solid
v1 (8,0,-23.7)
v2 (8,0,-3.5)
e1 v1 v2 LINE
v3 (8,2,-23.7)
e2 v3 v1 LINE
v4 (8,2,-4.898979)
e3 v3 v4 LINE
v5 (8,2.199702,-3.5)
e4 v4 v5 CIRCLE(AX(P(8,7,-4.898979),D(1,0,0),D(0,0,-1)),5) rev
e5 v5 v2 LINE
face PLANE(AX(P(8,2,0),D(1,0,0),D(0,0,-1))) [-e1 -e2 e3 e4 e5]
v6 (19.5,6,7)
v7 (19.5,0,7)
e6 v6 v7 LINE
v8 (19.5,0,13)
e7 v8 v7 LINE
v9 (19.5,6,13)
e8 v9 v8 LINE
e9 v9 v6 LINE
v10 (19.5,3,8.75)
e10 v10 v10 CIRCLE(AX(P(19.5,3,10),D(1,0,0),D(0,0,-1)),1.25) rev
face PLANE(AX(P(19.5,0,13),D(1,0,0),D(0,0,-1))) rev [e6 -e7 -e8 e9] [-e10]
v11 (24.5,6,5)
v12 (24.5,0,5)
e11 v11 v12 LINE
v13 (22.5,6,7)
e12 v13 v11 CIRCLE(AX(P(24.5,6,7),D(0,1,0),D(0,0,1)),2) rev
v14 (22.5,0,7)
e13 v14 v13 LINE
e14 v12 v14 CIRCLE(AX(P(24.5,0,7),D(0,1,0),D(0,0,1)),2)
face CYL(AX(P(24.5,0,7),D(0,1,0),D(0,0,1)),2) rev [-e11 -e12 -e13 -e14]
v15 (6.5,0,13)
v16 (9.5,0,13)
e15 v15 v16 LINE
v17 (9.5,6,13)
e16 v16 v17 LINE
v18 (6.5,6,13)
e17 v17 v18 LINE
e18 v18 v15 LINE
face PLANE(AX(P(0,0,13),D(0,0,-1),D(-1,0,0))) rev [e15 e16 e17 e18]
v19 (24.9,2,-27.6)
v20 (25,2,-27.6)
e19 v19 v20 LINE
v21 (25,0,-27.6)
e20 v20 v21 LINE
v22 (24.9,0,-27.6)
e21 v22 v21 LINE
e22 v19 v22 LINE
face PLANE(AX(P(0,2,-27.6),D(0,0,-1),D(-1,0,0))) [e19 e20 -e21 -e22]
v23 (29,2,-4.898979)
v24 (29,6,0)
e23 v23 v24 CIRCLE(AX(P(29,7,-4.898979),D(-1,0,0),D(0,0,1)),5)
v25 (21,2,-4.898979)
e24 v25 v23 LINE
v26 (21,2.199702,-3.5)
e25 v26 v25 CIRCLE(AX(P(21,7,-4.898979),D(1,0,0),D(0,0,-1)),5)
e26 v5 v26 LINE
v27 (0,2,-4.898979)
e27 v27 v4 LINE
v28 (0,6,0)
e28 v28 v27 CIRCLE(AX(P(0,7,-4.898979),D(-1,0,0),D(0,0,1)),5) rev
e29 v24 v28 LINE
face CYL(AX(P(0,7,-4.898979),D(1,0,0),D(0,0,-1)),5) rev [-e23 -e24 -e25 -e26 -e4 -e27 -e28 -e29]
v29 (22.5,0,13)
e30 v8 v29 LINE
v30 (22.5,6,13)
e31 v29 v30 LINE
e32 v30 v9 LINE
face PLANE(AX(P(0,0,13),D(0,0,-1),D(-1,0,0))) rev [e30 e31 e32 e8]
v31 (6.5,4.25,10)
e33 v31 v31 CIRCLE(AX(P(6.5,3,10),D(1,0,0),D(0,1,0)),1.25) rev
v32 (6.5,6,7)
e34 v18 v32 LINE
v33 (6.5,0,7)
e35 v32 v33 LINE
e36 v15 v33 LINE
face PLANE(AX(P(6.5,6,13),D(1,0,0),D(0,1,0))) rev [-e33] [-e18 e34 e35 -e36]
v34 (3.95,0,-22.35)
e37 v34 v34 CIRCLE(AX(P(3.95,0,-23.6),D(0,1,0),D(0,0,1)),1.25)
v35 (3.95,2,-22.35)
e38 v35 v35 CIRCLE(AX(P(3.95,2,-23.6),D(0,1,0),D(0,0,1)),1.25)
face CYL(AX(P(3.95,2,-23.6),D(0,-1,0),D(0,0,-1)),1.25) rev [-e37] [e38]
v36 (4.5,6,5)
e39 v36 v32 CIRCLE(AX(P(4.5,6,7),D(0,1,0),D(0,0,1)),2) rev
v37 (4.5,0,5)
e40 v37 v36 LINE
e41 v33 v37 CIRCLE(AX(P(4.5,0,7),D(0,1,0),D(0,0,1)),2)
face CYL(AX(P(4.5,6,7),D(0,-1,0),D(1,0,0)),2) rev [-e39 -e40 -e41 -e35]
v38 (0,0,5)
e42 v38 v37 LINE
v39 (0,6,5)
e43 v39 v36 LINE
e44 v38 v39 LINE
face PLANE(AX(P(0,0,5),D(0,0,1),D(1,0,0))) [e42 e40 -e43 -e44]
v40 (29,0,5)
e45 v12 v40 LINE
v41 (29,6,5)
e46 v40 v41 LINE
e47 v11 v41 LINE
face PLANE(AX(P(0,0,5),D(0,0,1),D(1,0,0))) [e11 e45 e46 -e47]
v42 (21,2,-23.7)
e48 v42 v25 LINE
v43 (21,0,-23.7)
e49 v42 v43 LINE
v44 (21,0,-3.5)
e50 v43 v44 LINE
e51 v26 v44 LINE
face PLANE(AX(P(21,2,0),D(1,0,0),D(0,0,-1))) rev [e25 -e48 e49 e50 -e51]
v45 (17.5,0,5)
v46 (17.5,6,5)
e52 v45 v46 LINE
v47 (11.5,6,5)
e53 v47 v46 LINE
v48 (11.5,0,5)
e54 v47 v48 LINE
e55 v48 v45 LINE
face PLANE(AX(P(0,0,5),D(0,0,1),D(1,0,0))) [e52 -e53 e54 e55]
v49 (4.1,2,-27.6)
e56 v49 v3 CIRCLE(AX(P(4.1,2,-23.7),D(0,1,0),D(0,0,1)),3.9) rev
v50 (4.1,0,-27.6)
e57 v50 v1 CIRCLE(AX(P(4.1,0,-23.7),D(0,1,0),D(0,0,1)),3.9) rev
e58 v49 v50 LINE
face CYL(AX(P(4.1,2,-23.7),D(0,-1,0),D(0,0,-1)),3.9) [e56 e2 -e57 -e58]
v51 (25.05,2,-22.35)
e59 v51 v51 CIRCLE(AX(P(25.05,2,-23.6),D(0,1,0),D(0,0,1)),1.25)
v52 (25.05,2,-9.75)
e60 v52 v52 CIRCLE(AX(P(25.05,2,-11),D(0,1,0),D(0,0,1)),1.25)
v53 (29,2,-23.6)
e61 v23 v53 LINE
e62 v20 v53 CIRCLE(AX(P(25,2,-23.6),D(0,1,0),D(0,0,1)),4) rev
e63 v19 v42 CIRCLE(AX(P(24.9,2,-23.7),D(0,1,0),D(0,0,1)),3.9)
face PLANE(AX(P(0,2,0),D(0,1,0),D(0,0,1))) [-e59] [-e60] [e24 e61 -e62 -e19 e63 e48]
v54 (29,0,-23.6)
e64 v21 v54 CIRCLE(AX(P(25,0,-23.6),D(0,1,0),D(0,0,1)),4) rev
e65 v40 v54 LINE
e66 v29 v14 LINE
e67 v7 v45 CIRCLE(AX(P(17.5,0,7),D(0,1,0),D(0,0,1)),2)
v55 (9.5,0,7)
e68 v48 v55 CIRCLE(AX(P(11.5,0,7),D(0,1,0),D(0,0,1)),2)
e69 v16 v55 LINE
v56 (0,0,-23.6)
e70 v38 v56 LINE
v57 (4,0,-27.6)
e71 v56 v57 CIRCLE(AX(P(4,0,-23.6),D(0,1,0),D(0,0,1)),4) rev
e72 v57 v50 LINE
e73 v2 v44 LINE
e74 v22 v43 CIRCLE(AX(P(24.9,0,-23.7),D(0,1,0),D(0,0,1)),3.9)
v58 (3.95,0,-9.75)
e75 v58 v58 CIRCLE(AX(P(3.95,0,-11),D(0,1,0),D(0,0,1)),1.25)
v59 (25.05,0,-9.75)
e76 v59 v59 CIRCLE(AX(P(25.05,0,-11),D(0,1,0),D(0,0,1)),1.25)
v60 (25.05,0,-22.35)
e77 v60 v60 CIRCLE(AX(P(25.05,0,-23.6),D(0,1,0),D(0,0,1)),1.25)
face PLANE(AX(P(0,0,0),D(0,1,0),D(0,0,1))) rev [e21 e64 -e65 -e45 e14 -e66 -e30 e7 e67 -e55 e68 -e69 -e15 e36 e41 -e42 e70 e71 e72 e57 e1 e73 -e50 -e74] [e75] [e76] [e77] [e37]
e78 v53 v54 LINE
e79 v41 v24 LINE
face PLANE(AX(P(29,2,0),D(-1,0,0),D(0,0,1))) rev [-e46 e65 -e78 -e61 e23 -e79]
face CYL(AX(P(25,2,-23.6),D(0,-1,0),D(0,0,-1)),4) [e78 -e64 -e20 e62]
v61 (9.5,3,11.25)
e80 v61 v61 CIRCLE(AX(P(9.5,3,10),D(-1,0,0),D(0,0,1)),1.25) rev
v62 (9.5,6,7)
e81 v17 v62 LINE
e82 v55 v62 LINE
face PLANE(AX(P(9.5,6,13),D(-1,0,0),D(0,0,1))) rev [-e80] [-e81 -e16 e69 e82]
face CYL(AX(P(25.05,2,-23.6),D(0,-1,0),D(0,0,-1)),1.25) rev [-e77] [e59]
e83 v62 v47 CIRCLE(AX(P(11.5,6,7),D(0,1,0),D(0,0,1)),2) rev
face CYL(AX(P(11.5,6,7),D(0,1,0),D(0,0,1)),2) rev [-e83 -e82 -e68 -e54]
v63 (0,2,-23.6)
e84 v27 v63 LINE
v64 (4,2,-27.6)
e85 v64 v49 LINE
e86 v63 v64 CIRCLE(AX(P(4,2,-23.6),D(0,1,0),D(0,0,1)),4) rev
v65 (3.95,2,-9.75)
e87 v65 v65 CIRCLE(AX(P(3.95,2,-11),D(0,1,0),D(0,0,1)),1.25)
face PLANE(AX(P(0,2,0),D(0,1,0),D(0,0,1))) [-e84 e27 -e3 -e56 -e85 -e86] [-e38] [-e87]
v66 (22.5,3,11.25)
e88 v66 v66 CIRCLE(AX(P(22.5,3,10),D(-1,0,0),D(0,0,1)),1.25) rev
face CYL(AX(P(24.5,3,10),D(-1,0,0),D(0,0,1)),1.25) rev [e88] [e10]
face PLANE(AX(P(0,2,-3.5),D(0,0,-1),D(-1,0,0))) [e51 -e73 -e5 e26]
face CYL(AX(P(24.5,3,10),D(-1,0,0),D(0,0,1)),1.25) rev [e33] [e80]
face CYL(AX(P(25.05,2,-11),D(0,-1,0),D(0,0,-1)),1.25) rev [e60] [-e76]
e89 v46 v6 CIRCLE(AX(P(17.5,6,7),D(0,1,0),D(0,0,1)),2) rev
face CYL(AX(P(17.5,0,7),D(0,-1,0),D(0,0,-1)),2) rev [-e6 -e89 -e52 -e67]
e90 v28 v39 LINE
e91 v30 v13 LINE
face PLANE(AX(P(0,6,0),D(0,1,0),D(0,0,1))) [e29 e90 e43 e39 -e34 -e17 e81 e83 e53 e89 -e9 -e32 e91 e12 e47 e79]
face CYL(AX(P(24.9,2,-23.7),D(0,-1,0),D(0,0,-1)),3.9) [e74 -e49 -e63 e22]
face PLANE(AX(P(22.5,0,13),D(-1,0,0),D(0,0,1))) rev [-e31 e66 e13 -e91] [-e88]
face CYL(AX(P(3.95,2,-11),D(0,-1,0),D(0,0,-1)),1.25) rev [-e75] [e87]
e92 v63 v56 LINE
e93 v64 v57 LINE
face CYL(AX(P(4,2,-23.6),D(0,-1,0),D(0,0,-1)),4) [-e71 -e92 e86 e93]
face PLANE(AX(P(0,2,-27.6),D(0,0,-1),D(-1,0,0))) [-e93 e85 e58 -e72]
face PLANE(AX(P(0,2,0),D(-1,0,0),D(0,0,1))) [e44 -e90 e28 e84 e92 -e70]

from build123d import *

# Parameters (mm, degrees)
SKETCH1_R                = 1.25
BOSS_EXTRUDE1_DEPTH      = 2
BOSS_EXTRUDE2_DEPTH      = 4
BOSS_EXTRUDE2_DEPTH_BACK = 2
SKETCH2_W                = 29
SKETCH2_H                = 5
FILLET1_R                = 5
SKETCH3_W                = 3
SKETCH3_H                = 6
BOSS_EXTRUDE3_DEPTH      = 8
FILLET2_R                = 2
CUT_EXTRUDE1_DEPTH       = 15
CUT_EXTRUDE1_DEPTH_BACK  = 7
SKETCH4_R                = 1.25


with BuildPart() as part:
    # Sketch1 → Boss-Extrude1 (new body)
    with BuildSketch(Plane(origin=(0, 0, 0), x_dir=(1, 0, 0), z_dir=(0, 1, 0))):
        with BuildLine():
            Line((24.9, 27.6), (25, 27.6))
            ThreePointArc((25, 27.6), (27.828427125, 26.428427125), (29, 23.6))
            Line((29, 23.6), (29, 0))
            Line((29, 0), (0, 0))
            Line((0, 0), (0, 23.6))
            ThreePointArc((0, 23.6), (1.171572875, 26.428427125), (4, 27.6))
            Line((4, 27.6), (4.1, 27.6))
            ThreePointArc((4.1, 27.6), (6.857716447, 26.457716447), (8, 23.7))
            Line((8, 23.7), (8, 3.5))
            Line((8, 3.5), (21, 3.5))
            Line((21, 3.5), (21, 23.7))
            ThreePointArc((21, 23.7), (22.142283553, 26.457716447), (24.9, 27.6))
        make_face()
        with Locations(Location((3.95, 23.6, 0), (0, 0, 270))):
            Circle(SKETCH1_R, mode=Mode.SUBTRACT)
        with Locations(Location((25.05, 23.6, 0), (0, 0, 270))):
            Circle(SKETCH1_R, mode=Mode.SUBTRACT)
        with Locations(Location((25.05, 11, 0), (0, 0, 270))):
            Circle(SKETCH1_R, mode=Mode.SUBTRACT)
        with Locations(Location((3.95, 11, 0), (0, 0, 270))):
            Circle(SKETCH1_R, mode=Mode.SUBTRACT)
    extrude(amount=BOSS_EXTRUDE1_DEPTH)

    # Sketch2 → Boss-Extrude2 (add, two sides: drawn at the far end of the back side and taken through both)
    with BuildSketch(Plane(origin=(0, 2, 0), x_dir=(1, 0, 0), z_dir=(0, 1, 0)).offset(-BOSS_EXTRUDE2_DEPTH_BACK)):
        with Locations((14.5, -2.5)):
            Rectangle(SKETCH2_W, SKETCH2_H)
    extrude(amount=BOSS_EXTRUDE2_DEPTH + BOSS_EXTRUDE2_DEPTH_BACK)

    # Fillet1
    # the kernel refuses this fillet: 5 mm, written as the material it adds along each edge
    with BuildSketch(Plane(origin=(29, 2, 0), x_dir=(0, 0, -1), z_dir=(-1, 0, 0))) as fillet1_piece_1_section:
        with BuildLine():
            CenterArc((4.898979486, -5), FILLET1_R, 90, 78.463040967)
            Line((0, -4), (0, 0))
            Line((0, 0), (4.898979486, 0))
        make_face()
    fillet1_piece_1 = extrude(amount=41.247448714, mode=Mode.PRIVATE)
    fillet1_piece_1 = split(fillet1_piece_1, bisect_by=Plane(origin=(21, 2, 0), z_dir=(1, 0, 0)), keep=Keep.TOP, mode=Mode.PRIVATE)
    add(fillet1_piece_1)
    with BuildSketch(Plane(origin=(41.247448714, 2, 0), x_dir=(0, 0, -1), z_dir=(-1, 0, 0))) as fillet1_piece_2_section:
        with BuildLine():
            CenterArc((4.898979486, -5), FILLET1_R, 90, 78.463040967)
            Line((0, -4), (0, 0))
            Line((0, 0), (4.898979486, 0))
        make_face()
    fillet1_piece_2 = extrude(amount=41.247448714, mode=Mode.PRIVATE)
    fillet1_piece_2 = split(fillet1_piece_2, bisect_by=Plane(origin=(21, 2, 0), z_dir=(-1, 0, 0)), keep=Keep.TOP, mode=Mode.PRIVATE)
    fillet1_piece_2 = split(fillet1_piece_2, bisect_by=Plane(origin=(41.247448714, 2, -3.5), z_dir=(0, 0, 1)), keep=Keep.TOP, mode=Mode.PRIVATE)
    add(fillet1_piece_2)
    with BuildSketch(Plane(origin=(41.247448714, 2, 0), x_dir=(0, 0, -1), z_dir=(-1, 0, 0))) as fillet1_piece_3_section:
        with BuildLine():
            CenterArc((4.898979486, -5), FILLET1_R, 90, 78.463040967)
            Line((0, -4), (0, 0))
            Line((0, 0), (4.898979486, 0))
        make_face()
    fillet1_piece_3 = extrude(amount=41.247448714, mode=Mode.PRIVATE)
    fillet1_piece_3 = split(fillet1_piece_3, bisect_by=Plane(origin=(8, 2, 0), z_dir=(-1, 0, 0)), keep=Keep.TOP, mode=Mode.PRIVATE)
    add(fillet1_piece_3)

    # Sketch3 → Boss-Extrude3 (add)
    with BuildSketch(Plane.XY.offset(5)):
        with Locations((8, 3)):
            Rectangle(SKETCH3_W, SKETCH3_H)
        with Locations((21, 3)):
            Rectangle(SKETCH3_W, SKETCH3_H)
    extrude(amount=BOSS_EXTRUDE3_DEPTH)

    # Fillet2
    fillet2_edges = [part.edges().sort_by_distance(p)[0] for p in [
        (9.5, 3, 5),
        (6.5, 3, 5),
        (19.5, 3, 5),
        (22.5, 3, 5),
    ]]
    fillet(fillet2_edges, radius=FILLET2_R)

    # Sketch4 → Cut-Extrude1 (cut, two sides: drawn at the far end of the back side and taken through both)
    with BuildSketch(Plane(origin=(9.5, 0, 0), x_dir=(0, 0, -1), z_dir=(1, 0, 0)).offset(-CUT_EXTRUDE1_DEPTH_BACK)):
        with Locations(Location((-10, 3, 0), (0, 0, 180))):
            Circle(SKETCH4_R)
    extrude(amount=CUT_EXTRUDE1_DEPTH + CUT_EXTRUDE1_DEPTH_BACK, mode=Mode.SUBTRACT)


solid = part.part
